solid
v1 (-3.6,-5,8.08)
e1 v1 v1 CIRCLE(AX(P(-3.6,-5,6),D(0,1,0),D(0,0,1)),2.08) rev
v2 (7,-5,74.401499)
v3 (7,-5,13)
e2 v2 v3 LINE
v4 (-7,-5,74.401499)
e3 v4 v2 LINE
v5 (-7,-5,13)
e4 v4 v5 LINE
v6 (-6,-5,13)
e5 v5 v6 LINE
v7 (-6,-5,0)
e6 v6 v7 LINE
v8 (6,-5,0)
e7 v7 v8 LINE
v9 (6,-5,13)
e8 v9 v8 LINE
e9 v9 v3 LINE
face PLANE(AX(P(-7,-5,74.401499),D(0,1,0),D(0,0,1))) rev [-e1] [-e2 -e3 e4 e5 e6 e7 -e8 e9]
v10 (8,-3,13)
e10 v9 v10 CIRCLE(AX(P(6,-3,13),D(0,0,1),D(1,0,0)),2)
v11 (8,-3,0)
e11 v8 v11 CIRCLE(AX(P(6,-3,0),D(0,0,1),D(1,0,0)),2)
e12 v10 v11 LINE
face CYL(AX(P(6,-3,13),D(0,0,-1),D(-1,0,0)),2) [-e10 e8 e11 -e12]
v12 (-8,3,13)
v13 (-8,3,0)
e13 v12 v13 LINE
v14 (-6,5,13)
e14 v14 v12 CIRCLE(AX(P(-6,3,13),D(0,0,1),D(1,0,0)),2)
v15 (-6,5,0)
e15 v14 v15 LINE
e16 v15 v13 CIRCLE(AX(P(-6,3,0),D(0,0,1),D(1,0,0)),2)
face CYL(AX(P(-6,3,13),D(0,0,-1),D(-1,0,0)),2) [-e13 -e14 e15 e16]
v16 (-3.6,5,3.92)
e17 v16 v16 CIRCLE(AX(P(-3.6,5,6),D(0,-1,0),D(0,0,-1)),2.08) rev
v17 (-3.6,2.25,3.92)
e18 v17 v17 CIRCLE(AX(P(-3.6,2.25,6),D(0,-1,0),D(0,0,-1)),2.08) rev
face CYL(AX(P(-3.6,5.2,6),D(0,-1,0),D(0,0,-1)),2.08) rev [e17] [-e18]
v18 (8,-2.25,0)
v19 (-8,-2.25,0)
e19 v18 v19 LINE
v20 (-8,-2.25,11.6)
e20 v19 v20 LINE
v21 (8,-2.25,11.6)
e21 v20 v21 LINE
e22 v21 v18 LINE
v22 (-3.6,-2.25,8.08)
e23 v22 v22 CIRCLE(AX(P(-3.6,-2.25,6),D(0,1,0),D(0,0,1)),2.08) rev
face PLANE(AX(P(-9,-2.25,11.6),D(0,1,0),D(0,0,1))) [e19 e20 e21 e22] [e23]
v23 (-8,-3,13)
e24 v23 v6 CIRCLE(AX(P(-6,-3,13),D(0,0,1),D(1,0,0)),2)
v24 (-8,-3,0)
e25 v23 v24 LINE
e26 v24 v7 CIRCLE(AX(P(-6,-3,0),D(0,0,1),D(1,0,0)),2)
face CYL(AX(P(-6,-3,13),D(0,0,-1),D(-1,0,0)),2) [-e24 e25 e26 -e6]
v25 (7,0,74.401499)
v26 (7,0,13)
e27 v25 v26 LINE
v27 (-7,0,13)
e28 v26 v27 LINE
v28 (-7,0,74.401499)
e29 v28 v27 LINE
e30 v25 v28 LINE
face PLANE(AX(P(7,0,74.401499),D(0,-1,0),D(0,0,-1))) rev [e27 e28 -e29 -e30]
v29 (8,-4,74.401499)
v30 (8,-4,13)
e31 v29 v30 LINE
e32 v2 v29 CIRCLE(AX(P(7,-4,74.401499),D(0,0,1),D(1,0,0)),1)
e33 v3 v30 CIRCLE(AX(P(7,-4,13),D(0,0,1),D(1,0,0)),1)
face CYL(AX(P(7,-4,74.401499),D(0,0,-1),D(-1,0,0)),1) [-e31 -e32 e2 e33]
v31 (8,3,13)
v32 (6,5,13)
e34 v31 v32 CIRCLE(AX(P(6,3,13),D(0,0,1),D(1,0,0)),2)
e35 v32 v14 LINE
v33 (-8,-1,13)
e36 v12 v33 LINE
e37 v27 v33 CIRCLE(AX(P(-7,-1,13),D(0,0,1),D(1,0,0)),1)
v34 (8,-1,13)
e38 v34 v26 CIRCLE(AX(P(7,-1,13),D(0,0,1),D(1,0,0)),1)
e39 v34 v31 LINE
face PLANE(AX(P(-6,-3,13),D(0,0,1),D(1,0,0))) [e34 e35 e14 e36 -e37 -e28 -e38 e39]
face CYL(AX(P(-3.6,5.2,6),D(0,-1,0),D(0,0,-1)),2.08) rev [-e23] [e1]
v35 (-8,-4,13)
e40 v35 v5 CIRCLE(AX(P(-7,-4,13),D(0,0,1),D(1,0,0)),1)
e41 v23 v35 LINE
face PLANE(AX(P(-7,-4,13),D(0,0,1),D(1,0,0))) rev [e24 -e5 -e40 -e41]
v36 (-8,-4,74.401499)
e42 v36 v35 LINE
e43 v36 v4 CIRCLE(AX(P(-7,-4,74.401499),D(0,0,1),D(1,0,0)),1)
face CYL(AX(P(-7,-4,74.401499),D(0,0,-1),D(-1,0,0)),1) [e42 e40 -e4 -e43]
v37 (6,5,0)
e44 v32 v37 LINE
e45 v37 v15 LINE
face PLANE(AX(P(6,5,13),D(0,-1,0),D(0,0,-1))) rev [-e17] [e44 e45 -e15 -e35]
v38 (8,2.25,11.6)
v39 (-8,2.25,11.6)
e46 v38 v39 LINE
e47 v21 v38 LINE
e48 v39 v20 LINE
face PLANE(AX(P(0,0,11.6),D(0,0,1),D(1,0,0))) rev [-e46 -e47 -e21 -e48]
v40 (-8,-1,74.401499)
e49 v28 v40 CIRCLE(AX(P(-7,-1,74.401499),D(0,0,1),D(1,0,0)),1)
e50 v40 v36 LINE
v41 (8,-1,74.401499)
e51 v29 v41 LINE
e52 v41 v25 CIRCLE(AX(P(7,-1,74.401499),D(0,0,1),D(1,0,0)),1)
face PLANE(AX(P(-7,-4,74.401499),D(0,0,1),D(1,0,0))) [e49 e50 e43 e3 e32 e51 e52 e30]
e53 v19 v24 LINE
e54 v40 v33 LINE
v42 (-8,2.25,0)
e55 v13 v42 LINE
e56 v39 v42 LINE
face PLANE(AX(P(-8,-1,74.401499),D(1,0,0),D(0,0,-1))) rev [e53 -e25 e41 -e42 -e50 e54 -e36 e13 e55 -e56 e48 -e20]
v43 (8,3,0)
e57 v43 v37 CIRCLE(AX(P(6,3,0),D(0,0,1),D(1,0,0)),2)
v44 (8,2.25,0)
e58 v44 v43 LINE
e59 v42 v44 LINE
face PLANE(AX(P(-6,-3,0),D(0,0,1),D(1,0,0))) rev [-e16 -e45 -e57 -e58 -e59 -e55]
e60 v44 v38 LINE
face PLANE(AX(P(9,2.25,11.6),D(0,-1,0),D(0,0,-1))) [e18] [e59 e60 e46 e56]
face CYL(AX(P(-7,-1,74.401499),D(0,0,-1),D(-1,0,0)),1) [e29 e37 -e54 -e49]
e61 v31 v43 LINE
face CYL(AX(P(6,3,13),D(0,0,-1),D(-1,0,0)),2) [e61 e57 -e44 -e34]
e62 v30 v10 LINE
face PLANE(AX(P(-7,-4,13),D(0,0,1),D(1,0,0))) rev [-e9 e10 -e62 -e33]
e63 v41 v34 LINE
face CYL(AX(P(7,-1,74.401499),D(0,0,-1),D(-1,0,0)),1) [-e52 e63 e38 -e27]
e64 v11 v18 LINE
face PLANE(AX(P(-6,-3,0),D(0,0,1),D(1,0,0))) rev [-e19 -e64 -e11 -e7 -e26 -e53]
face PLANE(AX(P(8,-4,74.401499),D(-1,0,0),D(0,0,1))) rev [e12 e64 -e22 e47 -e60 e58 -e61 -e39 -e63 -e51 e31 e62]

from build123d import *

# Parameters (mm, degrees)
F_01_START                                = 13
F_01_TPU_16_BY_5_GAUGE_DEPTH              = 61.40149944
F_02_CORD_END_BLOCK_DEPTH                 = 13
F_03_START                                = -0.2
S03_OPEN_TWO_EAR_PIN_CLEVIS_W             = 18
S03_OPEN_TWO_EAR_PIN_CLEVIS_H             = 4.5
F_03_OPEN_TWO_EAR_PIN_CLEVIS_DEPTH        = 11.8
F_04_START                                = -5.2
S04_SHOULDER_PIN_THROUGH_BOTH_EARS_R      = 2.08
F_04_SHOULDER_PIN_THROUGH_BOTH_EARS_DEPTH = 10.4


# Read off the part's stored shape, not the designer's step: 01 - TPU 16 by 5 gauge
with BuildPart() as part:
    # 01 - TPU 16 by 5 gauge outline → 01 - TPU 16 by 5 gauge (new body)
    with BuildSketch(Plane.XY.offset(F_01_START)):
        with BuildLine():
            ThreePointArc((-8, -4), (-7.707106781, -4.707106781), (-7, -5))
            Line((-7, -5), (7, -5))
            ThreePointArc((7, -5), (7.707106781, -4.707106781), (8, -4))
            Line((8, -4), (8, -1))
            ThreePointArc((8, -1), (7.707106781, -0.292893219), (7, 0))
            Line((7, 0), (-7, 0))
            ThreePointArc((-7, 0), (-7.707106781, -0.292893219), (-8, -1))
            Line((-8, -1), (-8, -4))
        make_face()
    extrude(amount=F_01_TPU_16_BY_5_GAUGE_DEPTH)

    # S02 - Cord end block → 02 - Cord end block (add)
    with BuildSketch(Plane.XY):
        with BuildLine():
            Line((-6, -5), (6, -5))
            ThreePointArc((6, -5), (7.414213562, -4.414213562), (8, -3))
            Line((8, -3), (8, 3))
            ThreePointArc((8, 3), (7.414213562, 4.414213562), (6, 5))
            Line((6, 5), (-6, 5))
            ThreePointArc((-6, 5), (-7.414213562, 4.414213562), (-8, 3))
            Line((-8, 3), (-8, -3))
            ThreePointArc((-8, -3), (-7.414213562, -4.414213562), (-6, -5))
        make_face()
    extrude(amount=F_02_CORD_END_BLOCK_DEPTH)

    # S03 - Open two-ear pin clevis → 03 - Open two-ear pin clevis (cut)
    with BuildSketch(Plane.XY.offset(F_03_START)):
        Rectangle(S03_OPEN_TWO_EAR_PIN_CLEVIS_W, S03_OPEN_TWO_EAR_PIN_CLEVIS_H)
    extrude(amount=F_03_OPEN_TWO_EAR_PIN_CLEVIS_DEPTH, mode=Mode.SUBTRACT)

    # S04 - Shoulder pin through both ears → 04 - Shoulder pin through both ears (cut)
    with BuildSketch(Plane(origin=(0, 0, 0), x_dir=(1, 0, 0), z_dir=(0, 1, 0)).offset(F_04_START)):
        with Locations(Location((-3.6, -6, 0), (0, 0, 90))):
            Circle(S04_SHOULDER_PIN_THROUGH_BOTH_EARS_R)
    extrude(amount=F_04_SHOULDER_PIN_THROUGH_BOTH_EARS_DEPTH, mode=Mode.SUBTRACT)


solid = part.part
